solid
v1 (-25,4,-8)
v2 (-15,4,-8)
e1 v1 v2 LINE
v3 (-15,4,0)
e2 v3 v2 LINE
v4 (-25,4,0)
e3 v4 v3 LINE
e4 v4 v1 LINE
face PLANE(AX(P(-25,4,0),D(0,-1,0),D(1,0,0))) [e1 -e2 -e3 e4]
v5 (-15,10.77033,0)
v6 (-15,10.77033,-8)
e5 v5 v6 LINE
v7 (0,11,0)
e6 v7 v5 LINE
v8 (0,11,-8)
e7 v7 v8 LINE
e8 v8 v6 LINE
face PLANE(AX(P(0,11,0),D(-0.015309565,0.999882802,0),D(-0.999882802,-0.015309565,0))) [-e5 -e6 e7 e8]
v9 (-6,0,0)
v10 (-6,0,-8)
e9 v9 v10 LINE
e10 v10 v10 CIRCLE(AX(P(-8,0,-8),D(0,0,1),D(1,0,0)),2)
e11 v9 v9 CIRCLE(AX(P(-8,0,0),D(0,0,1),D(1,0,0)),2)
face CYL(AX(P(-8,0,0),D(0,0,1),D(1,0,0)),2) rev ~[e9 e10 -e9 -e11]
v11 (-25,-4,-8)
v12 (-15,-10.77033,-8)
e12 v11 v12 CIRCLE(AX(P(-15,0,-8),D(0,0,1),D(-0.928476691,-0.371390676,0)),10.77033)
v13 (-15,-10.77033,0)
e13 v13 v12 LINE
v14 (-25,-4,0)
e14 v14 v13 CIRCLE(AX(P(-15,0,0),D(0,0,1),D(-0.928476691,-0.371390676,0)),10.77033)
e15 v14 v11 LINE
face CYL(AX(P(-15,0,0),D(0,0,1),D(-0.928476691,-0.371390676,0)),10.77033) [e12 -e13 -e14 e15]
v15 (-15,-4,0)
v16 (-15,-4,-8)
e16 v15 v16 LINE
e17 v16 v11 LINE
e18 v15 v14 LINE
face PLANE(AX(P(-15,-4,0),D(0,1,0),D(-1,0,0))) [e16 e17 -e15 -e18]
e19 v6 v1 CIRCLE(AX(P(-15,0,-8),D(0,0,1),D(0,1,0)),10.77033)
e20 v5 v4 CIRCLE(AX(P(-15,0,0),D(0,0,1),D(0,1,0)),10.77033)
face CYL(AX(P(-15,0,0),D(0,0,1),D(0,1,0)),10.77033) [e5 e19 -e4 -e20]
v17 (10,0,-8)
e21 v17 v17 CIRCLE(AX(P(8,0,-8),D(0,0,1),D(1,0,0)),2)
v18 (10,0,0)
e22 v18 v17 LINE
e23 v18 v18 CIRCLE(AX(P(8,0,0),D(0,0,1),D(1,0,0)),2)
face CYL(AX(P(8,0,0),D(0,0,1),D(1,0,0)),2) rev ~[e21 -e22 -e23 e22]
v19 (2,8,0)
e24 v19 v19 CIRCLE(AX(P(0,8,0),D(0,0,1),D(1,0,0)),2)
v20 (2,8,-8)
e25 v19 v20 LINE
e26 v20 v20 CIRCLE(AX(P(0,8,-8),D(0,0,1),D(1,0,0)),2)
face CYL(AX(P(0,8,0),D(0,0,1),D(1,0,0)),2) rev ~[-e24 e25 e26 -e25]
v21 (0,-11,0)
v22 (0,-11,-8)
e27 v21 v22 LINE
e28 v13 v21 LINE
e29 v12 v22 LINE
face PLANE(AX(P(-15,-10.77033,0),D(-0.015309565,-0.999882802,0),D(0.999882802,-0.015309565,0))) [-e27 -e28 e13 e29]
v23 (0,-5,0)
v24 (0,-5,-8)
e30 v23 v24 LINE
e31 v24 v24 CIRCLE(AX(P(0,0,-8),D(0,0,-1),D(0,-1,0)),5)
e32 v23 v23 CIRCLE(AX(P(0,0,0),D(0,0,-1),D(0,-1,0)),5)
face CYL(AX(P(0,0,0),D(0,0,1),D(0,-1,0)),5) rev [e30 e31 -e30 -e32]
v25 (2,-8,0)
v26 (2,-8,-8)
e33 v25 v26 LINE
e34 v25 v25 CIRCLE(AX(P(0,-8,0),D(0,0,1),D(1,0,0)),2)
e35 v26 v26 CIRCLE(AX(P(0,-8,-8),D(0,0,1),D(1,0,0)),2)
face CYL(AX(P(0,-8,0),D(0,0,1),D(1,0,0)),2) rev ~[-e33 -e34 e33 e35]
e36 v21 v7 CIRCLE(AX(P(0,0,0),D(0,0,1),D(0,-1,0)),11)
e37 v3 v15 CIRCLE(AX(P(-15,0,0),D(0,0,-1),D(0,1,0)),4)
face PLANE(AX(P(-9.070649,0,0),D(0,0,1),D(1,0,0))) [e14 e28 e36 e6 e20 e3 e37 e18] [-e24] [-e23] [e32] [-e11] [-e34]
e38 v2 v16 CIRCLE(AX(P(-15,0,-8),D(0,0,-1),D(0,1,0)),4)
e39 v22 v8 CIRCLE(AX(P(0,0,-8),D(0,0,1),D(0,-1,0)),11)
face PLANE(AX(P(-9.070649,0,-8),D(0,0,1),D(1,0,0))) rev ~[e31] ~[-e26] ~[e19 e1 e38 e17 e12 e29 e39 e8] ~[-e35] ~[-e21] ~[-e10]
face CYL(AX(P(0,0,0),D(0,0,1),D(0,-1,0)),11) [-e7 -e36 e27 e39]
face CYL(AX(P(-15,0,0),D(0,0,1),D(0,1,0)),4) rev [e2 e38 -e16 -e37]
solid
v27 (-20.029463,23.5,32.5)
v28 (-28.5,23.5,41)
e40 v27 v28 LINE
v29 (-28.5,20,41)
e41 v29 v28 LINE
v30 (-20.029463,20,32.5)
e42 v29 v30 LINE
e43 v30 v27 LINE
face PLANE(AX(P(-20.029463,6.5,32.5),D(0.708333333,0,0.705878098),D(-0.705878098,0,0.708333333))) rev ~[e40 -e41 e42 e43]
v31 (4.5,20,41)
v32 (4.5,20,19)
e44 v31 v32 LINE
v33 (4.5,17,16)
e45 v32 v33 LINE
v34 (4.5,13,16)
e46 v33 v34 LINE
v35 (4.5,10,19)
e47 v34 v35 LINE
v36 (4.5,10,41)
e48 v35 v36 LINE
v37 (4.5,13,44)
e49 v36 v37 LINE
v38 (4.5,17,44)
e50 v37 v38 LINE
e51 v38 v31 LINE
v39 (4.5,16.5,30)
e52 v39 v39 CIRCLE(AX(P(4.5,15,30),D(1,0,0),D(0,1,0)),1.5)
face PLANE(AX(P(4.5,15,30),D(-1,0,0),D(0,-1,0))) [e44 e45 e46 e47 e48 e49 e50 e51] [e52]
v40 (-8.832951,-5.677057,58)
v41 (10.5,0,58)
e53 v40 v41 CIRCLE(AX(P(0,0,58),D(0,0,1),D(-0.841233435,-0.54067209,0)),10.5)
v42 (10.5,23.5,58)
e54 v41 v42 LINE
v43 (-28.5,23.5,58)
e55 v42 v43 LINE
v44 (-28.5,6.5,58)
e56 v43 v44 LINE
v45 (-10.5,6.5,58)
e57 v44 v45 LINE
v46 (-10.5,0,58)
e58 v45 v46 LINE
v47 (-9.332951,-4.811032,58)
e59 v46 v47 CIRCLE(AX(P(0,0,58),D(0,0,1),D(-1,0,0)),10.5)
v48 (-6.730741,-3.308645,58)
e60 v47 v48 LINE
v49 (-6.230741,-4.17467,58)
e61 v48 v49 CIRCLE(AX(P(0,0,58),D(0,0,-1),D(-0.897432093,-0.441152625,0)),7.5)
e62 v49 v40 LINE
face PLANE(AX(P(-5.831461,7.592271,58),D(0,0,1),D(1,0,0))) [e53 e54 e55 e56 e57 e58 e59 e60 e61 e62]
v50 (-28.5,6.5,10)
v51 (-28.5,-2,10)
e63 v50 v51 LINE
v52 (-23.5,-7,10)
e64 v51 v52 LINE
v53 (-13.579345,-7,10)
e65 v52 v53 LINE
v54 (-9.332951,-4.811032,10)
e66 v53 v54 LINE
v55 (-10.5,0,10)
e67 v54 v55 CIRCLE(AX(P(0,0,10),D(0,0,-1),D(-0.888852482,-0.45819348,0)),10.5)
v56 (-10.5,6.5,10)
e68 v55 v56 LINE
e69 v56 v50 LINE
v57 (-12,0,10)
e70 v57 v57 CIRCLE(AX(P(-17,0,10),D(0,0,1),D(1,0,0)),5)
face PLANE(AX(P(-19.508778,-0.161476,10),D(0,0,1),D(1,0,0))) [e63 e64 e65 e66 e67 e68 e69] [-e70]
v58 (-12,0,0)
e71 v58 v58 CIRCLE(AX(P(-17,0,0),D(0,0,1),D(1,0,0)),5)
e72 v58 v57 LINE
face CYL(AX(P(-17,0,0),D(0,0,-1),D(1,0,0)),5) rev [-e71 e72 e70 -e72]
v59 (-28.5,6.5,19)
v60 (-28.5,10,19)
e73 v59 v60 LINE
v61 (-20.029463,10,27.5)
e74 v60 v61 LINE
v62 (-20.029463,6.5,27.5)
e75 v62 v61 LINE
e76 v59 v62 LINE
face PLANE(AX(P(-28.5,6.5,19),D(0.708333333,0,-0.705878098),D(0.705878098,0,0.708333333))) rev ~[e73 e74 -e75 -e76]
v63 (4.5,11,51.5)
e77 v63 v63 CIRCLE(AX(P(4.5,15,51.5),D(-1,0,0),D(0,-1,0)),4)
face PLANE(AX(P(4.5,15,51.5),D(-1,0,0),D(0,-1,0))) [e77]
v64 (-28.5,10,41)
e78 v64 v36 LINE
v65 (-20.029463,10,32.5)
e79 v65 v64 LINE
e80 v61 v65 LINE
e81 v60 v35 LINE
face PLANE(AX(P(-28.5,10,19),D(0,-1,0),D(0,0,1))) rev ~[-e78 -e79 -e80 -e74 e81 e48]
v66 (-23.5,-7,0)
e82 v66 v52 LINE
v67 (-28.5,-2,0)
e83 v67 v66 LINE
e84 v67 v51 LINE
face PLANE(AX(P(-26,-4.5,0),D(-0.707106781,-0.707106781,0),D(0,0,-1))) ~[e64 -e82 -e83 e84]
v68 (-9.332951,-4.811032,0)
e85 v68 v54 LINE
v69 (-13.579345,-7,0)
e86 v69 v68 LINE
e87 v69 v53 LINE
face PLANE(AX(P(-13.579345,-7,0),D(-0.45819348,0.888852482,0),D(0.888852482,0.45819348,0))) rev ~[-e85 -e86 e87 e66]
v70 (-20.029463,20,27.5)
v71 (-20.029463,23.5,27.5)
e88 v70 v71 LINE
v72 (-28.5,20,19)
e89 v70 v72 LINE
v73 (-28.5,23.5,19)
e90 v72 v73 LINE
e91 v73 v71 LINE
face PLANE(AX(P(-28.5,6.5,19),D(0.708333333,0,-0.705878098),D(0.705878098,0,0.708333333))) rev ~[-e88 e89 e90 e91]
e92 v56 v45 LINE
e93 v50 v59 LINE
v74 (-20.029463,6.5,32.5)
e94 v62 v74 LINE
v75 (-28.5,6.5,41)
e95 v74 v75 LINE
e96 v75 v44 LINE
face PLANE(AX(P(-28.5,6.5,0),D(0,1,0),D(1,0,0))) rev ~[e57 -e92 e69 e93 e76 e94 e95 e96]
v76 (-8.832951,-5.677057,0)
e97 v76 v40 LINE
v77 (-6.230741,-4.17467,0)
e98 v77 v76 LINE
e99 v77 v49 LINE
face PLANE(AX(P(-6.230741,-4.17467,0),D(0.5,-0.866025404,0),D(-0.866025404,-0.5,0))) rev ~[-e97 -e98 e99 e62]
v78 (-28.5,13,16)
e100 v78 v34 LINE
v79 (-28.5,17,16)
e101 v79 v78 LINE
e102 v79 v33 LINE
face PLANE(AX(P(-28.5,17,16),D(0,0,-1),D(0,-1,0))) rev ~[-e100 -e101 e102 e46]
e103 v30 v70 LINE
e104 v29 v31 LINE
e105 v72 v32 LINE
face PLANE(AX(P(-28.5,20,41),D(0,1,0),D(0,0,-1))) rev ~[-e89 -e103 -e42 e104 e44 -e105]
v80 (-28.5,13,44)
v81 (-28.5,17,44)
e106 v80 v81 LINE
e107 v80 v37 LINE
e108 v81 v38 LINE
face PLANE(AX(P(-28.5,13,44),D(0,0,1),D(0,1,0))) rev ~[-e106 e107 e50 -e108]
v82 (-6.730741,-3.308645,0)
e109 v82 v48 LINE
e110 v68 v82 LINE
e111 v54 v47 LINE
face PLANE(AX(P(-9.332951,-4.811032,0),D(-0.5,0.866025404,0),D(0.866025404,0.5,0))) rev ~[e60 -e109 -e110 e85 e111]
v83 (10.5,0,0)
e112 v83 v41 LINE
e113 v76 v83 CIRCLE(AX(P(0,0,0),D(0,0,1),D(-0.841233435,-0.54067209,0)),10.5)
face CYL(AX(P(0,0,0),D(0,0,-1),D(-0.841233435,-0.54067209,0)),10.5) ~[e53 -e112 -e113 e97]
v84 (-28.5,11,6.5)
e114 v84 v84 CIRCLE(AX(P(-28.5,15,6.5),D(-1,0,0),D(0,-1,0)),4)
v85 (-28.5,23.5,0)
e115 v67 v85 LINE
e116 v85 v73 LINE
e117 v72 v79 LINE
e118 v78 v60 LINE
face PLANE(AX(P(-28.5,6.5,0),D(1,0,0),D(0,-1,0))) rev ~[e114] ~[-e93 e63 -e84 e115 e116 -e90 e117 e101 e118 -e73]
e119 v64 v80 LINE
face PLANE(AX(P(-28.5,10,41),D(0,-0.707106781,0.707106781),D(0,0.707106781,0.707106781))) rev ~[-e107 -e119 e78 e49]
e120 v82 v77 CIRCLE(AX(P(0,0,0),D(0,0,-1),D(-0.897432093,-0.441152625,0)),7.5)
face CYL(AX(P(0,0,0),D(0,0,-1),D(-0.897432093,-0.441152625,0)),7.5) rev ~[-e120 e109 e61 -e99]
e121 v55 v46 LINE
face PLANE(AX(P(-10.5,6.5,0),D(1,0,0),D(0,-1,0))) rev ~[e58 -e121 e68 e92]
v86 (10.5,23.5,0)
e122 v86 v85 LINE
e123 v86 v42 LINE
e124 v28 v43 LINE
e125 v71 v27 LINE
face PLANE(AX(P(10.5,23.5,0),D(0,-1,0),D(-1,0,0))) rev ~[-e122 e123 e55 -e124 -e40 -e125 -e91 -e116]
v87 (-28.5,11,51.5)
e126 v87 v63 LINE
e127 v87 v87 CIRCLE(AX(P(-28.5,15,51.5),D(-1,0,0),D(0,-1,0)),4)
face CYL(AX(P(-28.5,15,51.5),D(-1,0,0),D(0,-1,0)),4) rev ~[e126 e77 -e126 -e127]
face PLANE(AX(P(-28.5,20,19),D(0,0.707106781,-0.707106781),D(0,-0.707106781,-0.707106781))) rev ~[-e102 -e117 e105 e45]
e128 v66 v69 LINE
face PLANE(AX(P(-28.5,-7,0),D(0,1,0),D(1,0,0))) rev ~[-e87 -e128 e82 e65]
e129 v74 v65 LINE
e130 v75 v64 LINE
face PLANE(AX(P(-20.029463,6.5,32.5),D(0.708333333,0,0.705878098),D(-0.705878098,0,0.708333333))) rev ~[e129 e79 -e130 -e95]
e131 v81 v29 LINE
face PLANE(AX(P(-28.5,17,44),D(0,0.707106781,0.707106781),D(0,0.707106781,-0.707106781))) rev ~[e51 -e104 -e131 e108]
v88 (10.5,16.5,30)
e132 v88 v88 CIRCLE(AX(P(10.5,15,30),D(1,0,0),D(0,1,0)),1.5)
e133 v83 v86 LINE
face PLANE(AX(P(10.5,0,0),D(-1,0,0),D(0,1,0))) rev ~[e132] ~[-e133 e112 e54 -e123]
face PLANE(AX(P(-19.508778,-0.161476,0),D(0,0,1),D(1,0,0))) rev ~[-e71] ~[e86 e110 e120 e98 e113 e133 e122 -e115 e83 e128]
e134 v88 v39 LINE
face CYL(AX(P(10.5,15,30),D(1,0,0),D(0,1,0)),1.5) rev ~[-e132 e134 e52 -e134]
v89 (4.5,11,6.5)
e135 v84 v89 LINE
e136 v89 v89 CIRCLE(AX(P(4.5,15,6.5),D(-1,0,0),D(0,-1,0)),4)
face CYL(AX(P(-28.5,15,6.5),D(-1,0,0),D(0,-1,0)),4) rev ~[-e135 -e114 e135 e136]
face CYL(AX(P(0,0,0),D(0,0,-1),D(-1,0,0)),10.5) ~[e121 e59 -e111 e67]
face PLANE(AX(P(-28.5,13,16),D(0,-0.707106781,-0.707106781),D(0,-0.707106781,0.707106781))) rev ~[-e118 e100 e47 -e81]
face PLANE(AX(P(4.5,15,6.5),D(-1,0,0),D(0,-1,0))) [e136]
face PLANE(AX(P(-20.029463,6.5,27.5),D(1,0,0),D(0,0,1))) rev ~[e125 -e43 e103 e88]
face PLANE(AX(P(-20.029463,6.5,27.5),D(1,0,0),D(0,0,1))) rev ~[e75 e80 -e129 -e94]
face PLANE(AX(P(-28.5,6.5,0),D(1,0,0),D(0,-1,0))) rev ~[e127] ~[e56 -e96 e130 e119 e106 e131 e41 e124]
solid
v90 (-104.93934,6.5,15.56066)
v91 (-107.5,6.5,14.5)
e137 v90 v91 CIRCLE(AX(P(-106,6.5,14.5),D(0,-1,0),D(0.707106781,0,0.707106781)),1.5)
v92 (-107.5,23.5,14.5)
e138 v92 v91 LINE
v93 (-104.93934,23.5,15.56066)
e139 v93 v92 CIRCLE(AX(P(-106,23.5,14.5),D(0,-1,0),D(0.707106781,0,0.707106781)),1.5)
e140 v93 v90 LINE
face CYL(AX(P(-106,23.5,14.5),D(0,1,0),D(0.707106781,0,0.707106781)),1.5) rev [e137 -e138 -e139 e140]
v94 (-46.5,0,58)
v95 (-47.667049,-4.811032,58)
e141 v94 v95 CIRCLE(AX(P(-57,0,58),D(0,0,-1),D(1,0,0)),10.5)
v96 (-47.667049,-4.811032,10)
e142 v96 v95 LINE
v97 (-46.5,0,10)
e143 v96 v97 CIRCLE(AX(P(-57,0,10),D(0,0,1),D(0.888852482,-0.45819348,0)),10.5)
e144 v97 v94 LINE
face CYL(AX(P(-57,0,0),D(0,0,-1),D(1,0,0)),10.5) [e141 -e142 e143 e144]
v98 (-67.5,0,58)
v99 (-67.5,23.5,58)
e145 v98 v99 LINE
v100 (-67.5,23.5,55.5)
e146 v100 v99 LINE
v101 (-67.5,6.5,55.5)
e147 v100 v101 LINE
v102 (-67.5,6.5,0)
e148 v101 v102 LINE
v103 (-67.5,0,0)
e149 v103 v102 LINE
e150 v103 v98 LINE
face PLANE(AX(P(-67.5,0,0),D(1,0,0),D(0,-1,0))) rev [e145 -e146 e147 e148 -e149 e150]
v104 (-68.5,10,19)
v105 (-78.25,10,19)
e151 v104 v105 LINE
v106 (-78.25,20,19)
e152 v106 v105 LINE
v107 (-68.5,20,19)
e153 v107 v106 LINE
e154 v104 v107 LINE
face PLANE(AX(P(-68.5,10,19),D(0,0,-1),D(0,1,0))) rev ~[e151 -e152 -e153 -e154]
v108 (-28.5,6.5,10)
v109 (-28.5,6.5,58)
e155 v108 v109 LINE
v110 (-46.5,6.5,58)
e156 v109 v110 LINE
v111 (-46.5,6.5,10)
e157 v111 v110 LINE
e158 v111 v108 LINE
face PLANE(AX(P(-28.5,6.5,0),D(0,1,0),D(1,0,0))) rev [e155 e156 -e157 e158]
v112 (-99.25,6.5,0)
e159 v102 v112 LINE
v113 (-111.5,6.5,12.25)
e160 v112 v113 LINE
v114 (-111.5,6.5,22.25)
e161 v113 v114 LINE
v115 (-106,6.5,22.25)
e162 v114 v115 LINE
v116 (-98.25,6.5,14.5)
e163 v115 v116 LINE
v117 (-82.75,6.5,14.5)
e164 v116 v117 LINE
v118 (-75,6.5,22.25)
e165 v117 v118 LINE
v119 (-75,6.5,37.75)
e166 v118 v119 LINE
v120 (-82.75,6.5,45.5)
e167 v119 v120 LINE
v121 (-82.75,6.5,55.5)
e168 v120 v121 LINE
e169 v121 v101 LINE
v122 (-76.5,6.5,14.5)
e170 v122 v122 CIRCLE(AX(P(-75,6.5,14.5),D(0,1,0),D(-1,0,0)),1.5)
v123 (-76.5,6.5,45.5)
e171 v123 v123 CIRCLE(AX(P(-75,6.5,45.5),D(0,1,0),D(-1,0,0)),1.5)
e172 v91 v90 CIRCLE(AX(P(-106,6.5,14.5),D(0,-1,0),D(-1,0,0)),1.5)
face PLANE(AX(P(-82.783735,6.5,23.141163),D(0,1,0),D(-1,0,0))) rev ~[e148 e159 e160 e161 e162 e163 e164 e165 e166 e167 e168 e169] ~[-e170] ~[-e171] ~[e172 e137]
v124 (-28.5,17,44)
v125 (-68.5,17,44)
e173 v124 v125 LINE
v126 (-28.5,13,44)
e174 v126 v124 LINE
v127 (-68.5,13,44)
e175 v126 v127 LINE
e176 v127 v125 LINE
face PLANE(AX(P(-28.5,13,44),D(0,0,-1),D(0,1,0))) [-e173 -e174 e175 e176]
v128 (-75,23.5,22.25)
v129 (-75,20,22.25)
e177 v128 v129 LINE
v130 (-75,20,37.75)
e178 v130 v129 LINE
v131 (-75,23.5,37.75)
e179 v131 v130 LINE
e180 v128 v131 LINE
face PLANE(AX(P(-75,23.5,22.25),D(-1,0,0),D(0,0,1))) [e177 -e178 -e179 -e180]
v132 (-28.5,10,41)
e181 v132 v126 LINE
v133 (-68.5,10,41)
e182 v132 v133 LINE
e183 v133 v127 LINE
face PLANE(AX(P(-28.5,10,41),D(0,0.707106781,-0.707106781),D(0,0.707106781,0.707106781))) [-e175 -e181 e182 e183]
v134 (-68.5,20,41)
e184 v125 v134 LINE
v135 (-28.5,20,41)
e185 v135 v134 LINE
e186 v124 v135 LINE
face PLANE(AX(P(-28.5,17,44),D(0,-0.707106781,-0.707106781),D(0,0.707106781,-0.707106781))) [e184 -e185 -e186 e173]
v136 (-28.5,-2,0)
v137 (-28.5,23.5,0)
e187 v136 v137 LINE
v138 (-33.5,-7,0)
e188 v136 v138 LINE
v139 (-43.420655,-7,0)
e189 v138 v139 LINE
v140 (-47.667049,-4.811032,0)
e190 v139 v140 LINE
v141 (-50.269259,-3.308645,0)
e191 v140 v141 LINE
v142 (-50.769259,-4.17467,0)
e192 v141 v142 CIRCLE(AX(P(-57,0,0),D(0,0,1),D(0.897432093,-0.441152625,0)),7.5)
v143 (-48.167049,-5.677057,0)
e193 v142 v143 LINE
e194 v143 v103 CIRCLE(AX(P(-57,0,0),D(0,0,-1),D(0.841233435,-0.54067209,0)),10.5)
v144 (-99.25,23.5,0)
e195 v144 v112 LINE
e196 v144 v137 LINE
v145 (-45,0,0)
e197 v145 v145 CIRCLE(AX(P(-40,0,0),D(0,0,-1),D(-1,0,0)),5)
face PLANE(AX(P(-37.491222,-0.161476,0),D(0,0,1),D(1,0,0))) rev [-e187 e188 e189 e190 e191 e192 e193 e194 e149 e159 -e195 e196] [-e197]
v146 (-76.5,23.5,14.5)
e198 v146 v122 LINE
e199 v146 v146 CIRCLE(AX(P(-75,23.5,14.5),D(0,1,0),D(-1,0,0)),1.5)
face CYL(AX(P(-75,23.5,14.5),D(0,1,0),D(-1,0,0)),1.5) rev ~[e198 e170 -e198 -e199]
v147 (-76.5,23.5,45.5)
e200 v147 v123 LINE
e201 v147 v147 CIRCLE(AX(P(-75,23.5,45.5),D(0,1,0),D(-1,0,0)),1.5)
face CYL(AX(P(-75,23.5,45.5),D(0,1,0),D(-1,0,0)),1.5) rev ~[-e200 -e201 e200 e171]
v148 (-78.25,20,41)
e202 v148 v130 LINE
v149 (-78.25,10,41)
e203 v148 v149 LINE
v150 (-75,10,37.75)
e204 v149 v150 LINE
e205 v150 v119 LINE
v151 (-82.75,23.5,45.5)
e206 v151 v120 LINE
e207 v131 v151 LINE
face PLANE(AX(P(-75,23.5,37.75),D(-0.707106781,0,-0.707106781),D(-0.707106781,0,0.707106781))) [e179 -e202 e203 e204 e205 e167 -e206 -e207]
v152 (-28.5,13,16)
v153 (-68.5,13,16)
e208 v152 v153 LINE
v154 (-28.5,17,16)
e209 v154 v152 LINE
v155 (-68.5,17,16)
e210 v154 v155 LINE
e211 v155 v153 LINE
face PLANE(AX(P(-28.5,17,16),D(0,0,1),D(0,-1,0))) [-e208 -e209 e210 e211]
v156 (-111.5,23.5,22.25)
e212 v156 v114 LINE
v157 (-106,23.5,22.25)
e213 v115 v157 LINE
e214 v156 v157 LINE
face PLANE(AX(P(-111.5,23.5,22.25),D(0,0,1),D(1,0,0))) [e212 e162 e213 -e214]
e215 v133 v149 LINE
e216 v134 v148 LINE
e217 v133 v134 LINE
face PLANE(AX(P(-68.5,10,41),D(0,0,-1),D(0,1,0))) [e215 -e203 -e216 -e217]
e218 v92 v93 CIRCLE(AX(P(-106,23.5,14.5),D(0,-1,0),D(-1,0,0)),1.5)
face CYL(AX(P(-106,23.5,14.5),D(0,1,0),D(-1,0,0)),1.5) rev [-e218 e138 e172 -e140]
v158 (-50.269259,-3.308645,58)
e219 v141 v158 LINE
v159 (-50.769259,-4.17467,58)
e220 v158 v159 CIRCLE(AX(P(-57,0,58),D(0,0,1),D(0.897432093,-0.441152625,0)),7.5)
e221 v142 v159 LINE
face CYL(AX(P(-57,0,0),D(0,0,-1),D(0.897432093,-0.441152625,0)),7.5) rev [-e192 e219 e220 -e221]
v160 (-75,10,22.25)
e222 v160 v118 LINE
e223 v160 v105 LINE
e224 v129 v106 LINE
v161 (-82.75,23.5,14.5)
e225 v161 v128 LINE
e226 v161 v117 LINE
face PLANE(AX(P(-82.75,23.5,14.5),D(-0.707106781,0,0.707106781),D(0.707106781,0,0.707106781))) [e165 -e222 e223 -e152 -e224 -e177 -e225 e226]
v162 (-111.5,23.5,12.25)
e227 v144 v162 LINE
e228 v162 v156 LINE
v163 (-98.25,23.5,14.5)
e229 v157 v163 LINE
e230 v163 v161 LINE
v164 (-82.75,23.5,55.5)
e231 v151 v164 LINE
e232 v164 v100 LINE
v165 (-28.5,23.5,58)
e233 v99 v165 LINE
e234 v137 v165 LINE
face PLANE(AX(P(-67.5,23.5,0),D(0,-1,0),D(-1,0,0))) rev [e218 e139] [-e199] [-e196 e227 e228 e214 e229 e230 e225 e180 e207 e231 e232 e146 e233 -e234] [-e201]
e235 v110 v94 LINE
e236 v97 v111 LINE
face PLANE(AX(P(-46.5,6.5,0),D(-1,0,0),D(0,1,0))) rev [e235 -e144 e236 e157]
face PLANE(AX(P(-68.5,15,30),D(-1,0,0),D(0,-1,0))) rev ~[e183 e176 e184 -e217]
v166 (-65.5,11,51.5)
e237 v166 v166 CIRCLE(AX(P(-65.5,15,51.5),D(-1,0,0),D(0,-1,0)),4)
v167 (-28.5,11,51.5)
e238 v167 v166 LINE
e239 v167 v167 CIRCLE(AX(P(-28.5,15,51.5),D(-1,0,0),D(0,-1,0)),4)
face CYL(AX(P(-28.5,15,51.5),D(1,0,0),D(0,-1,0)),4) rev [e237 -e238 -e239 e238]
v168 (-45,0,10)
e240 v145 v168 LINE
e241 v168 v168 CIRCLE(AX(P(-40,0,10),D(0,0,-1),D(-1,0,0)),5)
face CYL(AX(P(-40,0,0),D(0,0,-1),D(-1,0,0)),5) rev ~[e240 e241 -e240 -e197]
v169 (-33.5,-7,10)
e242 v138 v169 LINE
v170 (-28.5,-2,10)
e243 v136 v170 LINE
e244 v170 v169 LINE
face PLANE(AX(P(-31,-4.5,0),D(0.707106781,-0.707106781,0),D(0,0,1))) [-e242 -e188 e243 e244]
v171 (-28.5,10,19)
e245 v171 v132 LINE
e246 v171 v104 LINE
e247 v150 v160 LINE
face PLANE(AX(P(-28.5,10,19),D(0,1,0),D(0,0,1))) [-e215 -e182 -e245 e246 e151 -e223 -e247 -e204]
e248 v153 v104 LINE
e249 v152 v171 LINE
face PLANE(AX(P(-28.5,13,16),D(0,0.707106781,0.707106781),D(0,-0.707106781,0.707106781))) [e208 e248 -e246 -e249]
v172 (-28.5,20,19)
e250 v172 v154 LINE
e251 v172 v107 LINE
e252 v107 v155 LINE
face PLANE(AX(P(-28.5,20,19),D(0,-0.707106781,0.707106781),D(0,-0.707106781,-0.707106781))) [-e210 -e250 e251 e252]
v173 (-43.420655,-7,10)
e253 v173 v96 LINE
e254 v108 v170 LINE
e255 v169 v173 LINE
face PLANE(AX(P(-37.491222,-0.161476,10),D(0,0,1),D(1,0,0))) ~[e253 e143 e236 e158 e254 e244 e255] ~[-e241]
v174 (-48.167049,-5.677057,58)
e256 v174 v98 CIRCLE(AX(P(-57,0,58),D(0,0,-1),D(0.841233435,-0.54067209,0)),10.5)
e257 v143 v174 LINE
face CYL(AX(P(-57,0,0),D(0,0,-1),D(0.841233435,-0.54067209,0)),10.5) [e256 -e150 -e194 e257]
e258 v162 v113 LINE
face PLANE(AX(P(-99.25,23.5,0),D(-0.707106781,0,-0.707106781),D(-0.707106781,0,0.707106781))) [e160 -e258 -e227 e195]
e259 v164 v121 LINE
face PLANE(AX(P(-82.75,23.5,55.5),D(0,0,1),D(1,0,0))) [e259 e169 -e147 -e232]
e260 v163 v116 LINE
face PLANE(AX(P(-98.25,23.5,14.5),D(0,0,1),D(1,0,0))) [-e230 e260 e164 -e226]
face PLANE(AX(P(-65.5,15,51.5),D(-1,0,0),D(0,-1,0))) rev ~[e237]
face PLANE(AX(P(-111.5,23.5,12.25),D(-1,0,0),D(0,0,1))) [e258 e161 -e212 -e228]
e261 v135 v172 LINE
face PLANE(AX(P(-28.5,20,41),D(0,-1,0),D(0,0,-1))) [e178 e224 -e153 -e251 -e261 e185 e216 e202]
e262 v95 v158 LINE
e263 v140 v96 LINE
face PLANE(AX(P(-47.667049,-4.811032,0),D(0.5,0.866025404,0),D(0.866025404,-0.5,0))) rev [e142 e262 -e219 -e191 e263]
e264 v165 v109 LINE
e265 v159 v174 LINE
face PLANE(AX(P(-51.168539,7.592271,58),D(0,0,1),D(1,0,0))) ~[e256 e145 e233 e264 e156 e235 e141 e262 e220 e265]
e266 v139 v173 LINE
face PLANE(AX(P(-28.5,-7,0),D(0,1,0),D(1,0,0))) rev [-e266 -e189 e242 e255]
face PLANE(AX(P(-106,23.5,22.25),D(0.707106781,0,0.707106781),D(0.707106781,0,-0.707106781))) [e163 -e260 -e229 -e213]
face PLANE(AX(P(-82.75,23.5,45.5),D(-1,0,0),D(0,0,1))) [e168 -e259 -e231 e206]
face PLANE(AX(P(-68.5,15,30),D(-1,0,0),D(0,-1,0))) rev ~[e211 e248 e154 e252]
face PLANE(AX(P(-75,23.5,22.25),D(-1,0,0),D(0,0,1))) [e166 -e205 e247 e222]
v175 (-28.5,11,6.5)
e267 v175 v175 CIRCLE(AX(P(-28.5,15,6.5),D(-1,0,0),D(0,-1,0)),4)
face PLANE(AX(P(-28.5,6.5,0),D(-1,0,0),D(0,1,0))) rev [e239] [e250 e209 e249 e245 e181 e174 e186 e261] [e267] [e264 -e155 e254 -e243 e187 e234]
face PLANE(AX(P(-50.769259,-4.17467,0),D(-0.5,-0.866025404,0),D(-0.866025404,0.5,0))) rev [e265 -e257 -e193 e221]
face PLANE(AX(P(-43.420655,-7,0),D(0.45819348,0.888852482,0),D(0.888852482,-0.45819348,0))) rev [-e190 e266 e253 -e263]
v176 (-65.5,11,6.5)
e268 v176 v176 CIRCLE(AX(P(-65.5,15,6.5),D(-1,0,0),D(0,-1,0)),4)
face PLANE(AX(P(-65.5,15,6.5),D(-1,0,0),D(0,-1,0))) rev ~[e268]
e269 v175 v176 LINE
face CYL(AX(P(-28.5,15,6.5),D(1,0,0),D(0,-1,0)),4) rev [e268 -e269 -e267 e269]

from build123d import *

# Parameters (mm, degrees)
F1_DEPTH  = 58
F3_R      = 5
F4_DEPTH  = 10
F5_SIZE   = 5
F2_R      = 4
F7_DEPTH  = 33
F8_R      = 1.5
F9_DEPTH  = 78.001
F10_DEPTH = 37
F11_R     = 1.5
F12_DEPTH = 17
F13_DEPTH = 40
F14_W     = 10
F14_H     = 22
F15_REACH = 67.1670919472
F17_DEPTH = 17.001
F18_R     = 2
F19_DEPTH = 8


with BuildPart() as f1:
    # F0 (on Top) → F1 (new body)
    with BuildSketch(Plane.XY):
        with BuildLine():
            Line((-10.5, 6.5), (-10.5, 0))
            ThreePointArc((-10.5, 0), (-10.2040674771, -2.4752791606), (-9.3329510623, -4.811031539))
            Line((-9.3329510623, -4.811031539), (-6.7307406984, -3.3086446849))
            ThreePointArc((-6.7307406984, -3.3086446849), (6.4951905284, 3.75), (-6.2307406984, -4.1746700887))
            Line((-6.2307406984, -4.1746700887), (-8.8329510623, -5.6770569427))
            ThreePointArc((-8.8329510623, -5.6770569427), (2.958379104, -10.0746212374), (10.5, 0))
            Line((10.5, 0), (10.5, 23.5))
            Line((10.5, 23.5), (-28.5, 23.5))
            Line((-28.5, 23.5), (-28.5, 6.5))
            Line((-28.5, 6.5), (-10.5, 6.5))
        make_face()
    extrude(amount=F1_DEPTH)

    # F3 (on Top) → F4 (join)
    with BuildSketch(Plane.XY):
        with BuildLine():
            Line((-10.5, 0), (-10.5, 6.5))
            Line((-10.5, 6.5), (-28.5, 6.5))
            Line((-28.5, 6.5), (-28.5, -7))
            Line((-28.5, -7), (-13.5793450754, -7))
            Line((-13.5793450754, -7), (-9.3329510623, -4.811031539))
            ThreePointArc((-9.3329510623, -4.811031539), (-10.2040674771, -2.4752791606), (-10.5, 0))
        make_face()
        with Locations((-17, 0)):
            Circle(F3_R, mode=Mode.SUBTRACT)
    extrude(amount=F4_DEPTH)

    # F5
    f5_edges = [f1.edges().sort_by_distance(p)[0] for p in [
        (-28.5, -7, 5),
    ]]
    chamfer(f5_edges, length=F5_SIZE)


with BuildPart() as f6_1:
    # F6: instance of F1
    add(f1.part.mirror(Plane(origin=(-28.5, 13.9880952381, 27.0952380952), x_dir=(0, -1, 0), z_dir=(-1, 0, 0))))


with BuildPart() as f1_1:
    add(f1.part)

    # F2 (on face) → F7 (cut)
    with BuildSketch(Plane(origin=(-28.5, 0, 0), x_dir=(0, -1, 0), z_dir=(-1, 0, 0))):
        Polygon((-17, 44), (-20, 41), (-20, 19), (-17, 16), (-13, 16), (-10, 19), (-10, 41), (-13, 44), align=None)
        with Locations((-15, 6.5)):
            Circle(F2_R)
        with Locations((-15, 51.5)):
            Circle(F2_R)
    extrude(amount=-F7_DEPTH, mode=Mode.SUBTRACT)


with BuildPart() as f9_tool:
    # F8 (on face) → F9 (new body, through all)
    with BuildSketch(Plane.YZ.offset(10.5)):
        with Locations((15, 30)):
            Circle(F8_R)
    extrude(amount=-F9_DEPTH)


with BuildPart() as f1_2:
    add(f1_1.part)

    # F9: cut by f9_tool
    add(f9_tool.part, mode=Mode.SUBTRACT)

    # F16 (on face) → F17 (cut, through all)
    with BuildSketch(Plane.XZ.offset(-6.5)):
        Polygon((-20.029462827, 32.5), (-28.5, 41), (-28.5, 19), (-20.029462827, 27.5), align=None)
    extrude(amount=-F17_DEPTH, mode=Mode.SUBTRACT)


with BuildPart() as f6_1_1:
    add(f6_1.part)

    # F9: cut by f9_tool
    add(f9_tool.part, mode=Mode.SUBTRACT)

    # F2 (on face) → F10 (cut)
    with BuildSketch(Plane(origin=(-28.5, 0, 0), x_dir=(0, -1, 0), z_dir=(-1, 0, 0))):
        with Locations((-15, 51.5)):
            Circle(F2_R)
        with Locations((-15, 6.5)):
            Circle(F2_R)
    extrude(amount=F10_DEPTH, mode=Mode.SUBTRACT)

    # F11 (on face) → F12 (join)
    with BuildSketch(Plane(origin=(0, 23.5, 0), x_dir=(-1, 0, 0), z_dir=(0, 1, 0))):
        Polygon((67.5, 55.5), (67.5, 0), (99.25, 0), (111.5, 12.25), (111.5, 22.25), (106, 22.25), (102.125, 18.375), (98.25, 14.5), (82.75, 14.5), (75, 22.25), (75, 37.75), (82.75, 45.5), (82.75, 55.5), align=None)
        with Locations((75, 14.5)):
            Circle(F11_R, mode=Mode.SUBTRACT)
        with BuildLine():
            ThreePointArc((107.5, 14.5), (105.4259748515, 13.1141807012), (104.9393398282, 15.5606601718))
            ThreePointArc((104.9393398282, 15.5606601718), (106.5740251485, 15.8858192988), (107.5, 14.5))
        make_face(mode=Mode.SUBTRACT)
        with Locations((75, 45.5)):
            Circle(F11_R, mode=Mode.SUBTRACT)
    extrude(amount=-F12_DEPTH)

    # F2 (on face) → F13 (cut)
    with BuildSketch(Plane(origin=(-28.5, 0, 0), x_dir=(0, -1, 0), z_dir=(-1, 0, 0))):
        Polygon((-17, 44), (-20, 41), (-20, 19), (-17, 16), (-13, 16), (-10, 19), (-10, 41), (-13, 44), align=None)
    extrude(amount=F13_DEPTH, mode=Mode.SUBTRACT)

    f15_end = Plane(origin=(-102.125, 15, 18.375), x_dir=(0.7071067812, 0, -0.7071067812), z_dir=(0.7071067812, 0, 0.7071067812))
    # F14 (on face) → F15 (cut, up to a plane its end follows)
    with BuildSketch(Plane.YZ.offset(-68.5)):
        with Locations((15, 30)):
            Rectangle(F14_W, F14_H)
    f15_long = extrude(amount=-F15_REACH, mode=Mode.PRIVATE)
    add(split(f15_long, bisect_by=f15_end, keep=Keep.TOP, mode=Mode.PRIVATE), mode=Mode.SUBTRACT)


with BuildPart() as f19:
    # F18 (on Top) → F19 (new body)
    with BuildSketch(Plane.XY):
        with BuildLine():
            ThreePointArc((-15, 4), (-11, 0), (-15, -4))
            Line((-15, -4), (-25, -4))
            ThreePointArc((-25, -4), (-21.0381570675, -8.9185570149), (-15, -10.7703296143))
            Line((-15, -10.7703296143), (0, -11))
            ThreePointArc((0, -11), (11, 0), (0, 11))
            Line((0, 11), (-15, 10.7703296143))
            ThreePointArc((-15, 10.7703296143), (-21.0381570675, 8.9185570149), (-25, 4))
            Line((-25, 4), (-15, 4))
        make_face()
        with Locations((0, -8)):
            Circle(F18_R, mode=Mode.SUBTRACT)
        with Locations((-8, 0)):
            Circle(F18_R, mode=Mode.SUBTRACT)
        with BuildLine():
            ThreePointArc((0, 5), (5, 0), (0, -5))
            ThreePointArc((0, -5), (-5, 0), (0, 5))
        make_face(mode=Mode.SUBTRACT)
        with Locations((8, 0)):
            Circle(F18_R, mode=Mode.SUBTRACT)
        with Locations((0, 8)):
            Circle(F18_R, mode=Mode.SUBTRACT)
    extrude(amount=-F19_DEPTH)


solid = Compound([f1_2.part, f6_1_1.part, f19.part])
